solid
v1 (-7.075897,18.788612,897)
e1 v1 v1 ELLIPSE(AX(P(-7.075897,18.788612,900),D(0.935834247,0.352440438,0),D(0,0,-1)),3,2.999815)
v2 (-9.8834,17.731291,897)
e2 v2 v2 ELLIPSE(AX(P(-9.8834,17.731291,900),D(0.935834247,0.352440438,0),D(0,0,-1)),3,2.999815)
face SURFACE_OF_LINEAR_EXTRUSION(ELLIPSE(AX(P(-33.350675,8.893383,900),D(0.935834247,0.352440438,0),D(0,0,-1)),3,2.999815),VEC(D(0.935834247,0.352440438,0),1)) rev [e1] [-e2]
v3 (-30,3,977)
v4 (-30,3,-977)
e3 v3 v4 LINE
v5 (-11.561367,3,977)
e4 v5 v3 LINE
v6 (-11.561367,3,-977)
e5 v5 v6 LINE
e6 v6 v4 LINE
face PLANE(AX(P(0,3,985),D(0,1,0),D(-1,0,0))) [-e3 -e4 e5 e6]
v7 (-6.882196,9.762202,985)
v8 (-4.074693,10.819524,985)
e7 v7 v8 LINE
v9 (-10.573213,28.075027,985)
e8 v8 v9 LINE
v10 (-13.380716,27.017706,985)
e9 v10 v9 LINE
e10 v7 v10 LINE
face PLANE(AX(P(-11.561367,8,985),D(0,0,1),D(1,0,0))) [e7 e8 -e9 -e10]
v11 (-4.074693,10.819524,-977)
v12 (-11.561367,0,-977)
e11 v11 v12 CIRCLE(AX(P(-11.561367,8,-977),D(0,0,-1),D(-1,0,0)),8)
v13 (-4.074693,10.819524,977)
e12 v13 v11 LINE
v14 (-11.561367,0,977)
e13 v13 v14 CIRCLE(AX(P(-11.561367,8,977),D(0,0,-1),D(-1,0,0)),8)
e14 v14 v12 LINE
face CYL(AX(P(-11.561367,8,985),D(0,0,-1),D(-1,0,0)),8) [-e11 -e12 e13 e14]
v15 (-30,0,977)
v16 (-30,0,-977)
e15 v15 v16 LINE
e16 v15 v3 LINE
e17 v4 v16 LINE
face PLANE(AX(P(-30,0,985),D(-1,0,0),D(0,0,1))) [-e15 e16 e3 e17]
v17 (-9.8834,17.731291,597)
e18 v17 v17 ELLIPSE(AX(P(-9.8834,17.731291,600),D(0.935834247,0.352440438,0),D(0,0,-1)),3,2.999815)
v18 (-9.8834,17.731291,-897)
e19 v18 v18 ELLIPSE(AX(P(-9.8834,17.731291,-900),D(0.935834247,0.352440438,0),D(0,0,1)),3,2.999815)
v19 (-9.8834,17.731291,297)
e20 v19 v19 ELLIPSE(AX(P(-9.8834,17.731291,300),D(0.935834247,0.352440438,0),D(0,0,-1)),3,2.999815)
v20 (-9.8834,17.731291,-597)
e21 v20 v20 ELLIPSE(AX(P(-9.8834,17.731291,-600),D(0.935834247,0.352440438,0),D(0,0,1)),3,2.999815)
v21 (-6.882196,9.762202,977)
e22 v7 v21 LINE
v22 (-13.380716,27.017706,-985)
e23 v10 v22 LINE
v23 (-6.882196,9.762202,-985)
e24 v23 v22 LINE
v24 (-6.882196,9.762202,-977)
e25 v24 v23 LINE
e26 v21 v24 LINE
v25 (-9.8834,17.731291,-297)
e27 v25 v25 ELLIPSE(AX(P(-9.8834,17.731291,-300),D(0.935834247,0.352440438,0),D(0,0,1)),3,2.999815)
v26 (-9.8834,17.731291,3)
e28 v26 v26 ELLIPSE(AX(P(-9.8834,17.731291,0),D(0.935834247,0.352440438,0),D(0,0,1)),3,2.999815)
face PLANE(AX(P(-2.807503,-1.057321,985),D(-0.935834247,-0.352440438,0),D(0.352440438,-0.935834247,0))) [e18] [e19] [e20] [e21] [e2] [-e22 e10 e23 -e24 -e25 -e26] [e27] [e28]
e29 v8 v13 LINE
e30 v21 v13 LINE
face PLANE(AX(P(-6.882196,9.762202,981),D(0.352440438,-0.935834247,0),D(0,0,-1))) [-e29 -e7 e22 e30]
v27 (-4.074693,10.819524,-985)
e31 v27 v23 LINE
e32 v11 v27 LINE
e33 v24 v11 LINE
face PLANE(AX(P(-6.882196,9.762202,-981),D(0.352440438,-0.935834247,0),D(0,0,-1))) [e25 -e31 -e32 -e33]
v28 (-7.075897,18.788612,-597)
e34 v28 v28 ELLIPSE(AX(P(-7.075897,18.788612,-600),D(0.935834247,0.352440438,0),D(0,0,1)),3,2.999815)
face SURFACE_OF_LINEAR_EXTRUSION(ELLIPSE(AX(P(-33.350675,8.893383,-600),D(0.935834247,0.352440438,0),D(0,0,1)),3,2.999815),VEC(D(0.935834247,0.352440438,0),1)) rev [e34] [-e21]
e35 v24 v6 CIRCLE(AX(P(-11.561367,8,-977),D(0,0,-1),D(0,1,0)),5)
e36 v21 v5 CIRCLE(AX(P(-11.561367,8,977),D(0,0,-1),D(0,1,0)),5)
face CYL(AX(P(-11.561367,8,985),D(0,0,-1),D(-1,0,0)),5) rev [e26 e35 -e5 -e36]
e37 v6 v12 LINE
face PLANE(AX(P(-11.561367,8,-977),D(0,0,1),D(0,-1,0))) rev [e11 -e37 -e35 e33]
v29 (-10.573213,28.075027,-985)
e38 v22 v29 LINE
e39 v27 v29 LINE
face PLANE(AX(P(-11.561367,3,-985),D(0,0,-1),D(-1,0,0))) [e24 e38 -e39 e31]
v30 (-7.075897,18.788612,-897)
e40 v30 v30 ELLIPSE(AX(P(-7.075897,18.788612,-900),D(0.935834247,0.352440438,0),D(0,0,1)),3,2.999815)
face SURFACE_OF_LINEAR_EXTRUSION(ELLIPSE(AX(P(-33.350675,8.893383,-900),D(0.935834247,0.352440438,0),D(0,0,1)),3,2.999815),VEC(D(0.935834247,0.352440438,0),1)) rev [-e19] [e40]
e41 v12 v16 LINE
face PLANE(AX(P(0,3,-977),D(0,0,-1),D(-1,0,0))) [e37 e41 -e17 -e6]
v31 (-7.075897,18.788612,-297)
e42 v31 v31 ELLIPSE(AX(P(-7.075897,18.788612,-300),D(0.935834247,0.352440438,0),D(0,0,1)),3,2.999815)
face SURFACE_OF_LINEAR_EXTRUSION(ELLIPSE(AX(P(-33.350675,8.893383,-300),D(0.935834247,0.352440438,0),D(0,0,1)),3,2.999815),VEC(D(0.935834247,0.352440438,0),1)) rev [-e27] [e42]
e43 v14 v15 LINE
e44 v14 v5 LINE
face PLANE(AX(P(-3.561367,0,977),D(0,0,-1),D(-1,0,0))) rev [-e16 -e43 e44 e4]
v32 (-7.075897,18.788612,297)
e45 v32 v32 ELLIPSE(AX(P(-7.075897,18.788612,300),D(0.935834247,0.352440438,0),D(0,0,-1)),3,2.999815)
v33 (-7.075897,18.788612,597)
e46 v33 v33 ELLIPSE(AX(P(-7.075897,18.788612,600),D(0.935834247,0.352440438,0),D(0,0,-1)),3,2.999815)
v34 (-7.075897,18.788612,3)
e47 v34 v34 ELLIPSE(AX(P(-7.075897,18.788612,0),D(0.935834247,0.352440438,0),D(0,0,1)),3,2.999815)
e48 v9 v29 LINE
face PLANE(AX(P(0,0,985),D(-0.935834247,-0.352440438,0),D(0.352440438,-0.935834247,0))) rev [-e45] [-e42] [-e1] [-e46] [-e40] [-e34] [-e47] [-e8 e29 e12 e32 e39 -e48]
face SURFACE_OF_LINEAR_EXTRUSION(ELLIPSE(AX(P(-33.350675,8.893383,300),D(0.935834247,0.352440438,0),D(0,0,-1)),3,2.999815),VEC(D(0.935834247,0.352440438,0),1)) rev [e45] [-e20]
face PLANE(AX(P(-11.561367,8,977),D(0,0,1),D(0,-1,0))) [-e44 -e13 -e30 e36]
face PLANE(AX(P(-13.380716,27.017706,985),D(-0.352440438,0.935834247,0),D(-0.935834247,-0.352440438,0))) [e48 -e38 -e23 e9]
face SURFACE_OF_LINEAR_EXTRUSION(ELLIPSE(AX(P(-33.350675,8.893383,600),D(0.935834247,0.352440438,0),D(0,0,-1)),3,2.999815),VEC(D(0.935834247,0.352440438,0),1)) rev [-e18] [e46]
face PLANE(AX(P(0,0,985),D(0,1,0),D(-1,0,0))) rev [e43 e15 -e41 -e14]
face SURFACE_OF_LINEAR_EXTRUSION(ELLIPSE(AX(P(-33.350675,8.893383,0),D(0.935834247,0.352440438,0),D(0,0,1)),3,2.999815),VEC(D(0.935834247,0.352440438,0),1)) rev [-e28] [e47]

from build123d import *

# Parameters (mm, degrees)
SM_BASE_FLANGE_1_DEPTH = 985
CUT_EXTRUDE_START      = 977
CUT_EXTRUDE_1_DEPTH    = 8
CUT_EXTRUDE_2_REACH    = 987.857
SKETCH_4_RX            = 3
SKETCH_4_RY            = 2.999814796


# Read off the part's stored shape, not the designer's step: Вырез-Вытянуть1
# Sheet-metal steps are written as plain solids
with BuildPart() as part:
    # Sketch 1 → Базовая кромка1 (new, symmetric)
    with BuildSketch(Plane.XY):
        with BuildLine():
            Line((-10.573213138, 28.075027408), (-4.074693371, 10.819523503))
            ThreePointArc((-4.074693371, 10.819523503), (-4.982758525, 3.447867974), (-11.561367346, 0))
            Line((-11.561367346, 0), (-30, 0))
            Line((-30, 0), (-30, 3))
            Line((-30, 3), (-11.561367346, 3))
            ThreePointArc((-11.561367346, 3), (-7.449736833, 5.154917483), (-6.882196111, 9.76220219))
            Line((-6.882196111, 9.76220219), (-13.380715879, 27.017706094))
            Line((-13.380715879, 27.017706094), (-10.573213138, 28.075027408))
        make_face()
    extrude(amount=SM_BASE_FLANGE_1_DEPTH, both=True)

    # Вырез-Вытянуть1 outline → Вырез-Вытянуть1 (cut)
    with BuildSketch(Plane.XY.offset(CUT_EXTRUDE_START)):
        with BuildLine():
            Line((-4.074693371, 10.819523503), (-6.882196111, 9.76220219))
            ThreePointArc((-6.882196111, 9.76220219), (-7.449736833, 5.154917483), (-11.561367346, 3))
            Line((-11.561367346, 3), (-30, 3))
            Line((-30, 3), (-30, 0))
            Line((-30, 0), (-11.561367346, 0))
            ThreePointArc((-11.561367346, 0), (-4.982758526, 3.447867973), (-4.074693371, 10.819523503))
        make_face()
    cut_extrude_1 = extrude(amount=CUT_EXTRUDE_1_DEPTH, mode=Mode.SUBTRACT)

    # Зеркальное отражение1: Вырез-Вытянуть1 across plane
    add(cut_extrude_1.mirror(Plane.XY), mode=Mode.SUBTRACT)

    # Эскиз4 → Вырез-Вытянуть2 (cut, up to next)
    with BuildSketch(Plane(origin=(0, 0, 0), x_dir=(0, 0, -1), z_dir=(0.9358342469192185, 0.3524404379368797, 0)), mode=Mode.PRIVATE) as cut_extrude_2_sk1:
        with Locations(Location((600, 20.076859002), (0, 0, 180))):
            Ellipse(SKETCH_4_RX, SKETCH_4_RY)
    cut_extrude_2_tool1 = extrude(cut_extrude_2_sk1.sketch, amount=-CUT_EXTRUDE_2_REACH, mode=Mode.PRIVATE) & part.part
    # Эскиз4 → Вырез-Вытянуть2 (cut, up to next)
    with BuildSketch(Plane(origin=(0, 0, 0), x_dir=(0, 0, -1), z_dir=(0.9358342469192185, 0.3524404379368797, 0)), mode=Mode.PRIVATE) as cut_extrude_2_sk2:
        with Locations(Location((300, 20.076859002), (0, 0, 180))):
            Ellipse(SKETCH_4_RX, SKETCH_4_RY)
    cut_extrude_2_tool2 = extrude(cut_extrude_2_sk2.sketch, amount=-CUT_EXTRUDE_2_REACH, mode=Mode.PRIVATE) & part.part
    # Эскиз4 → Вырез-Вытянуть2 (cut, up to next)
    with BuildSketch(Plane(origin=(0, 0, 0), x_dir=(0, 0, -1), z_dir=(0.9358342469192185, 0.3524404379368797, 0)), mode=Mode.PRIVATE) as cut_extrude_2_sk3:
        with Locations(Location((0, 20.076859002), (0, 0, 180))):
            Ellipse(SKETCH_4_RX, SKETCH_4_RY)
    cut_extrude_2_tool3 = extrude(cut_extrude_2_sk3.sketch, amount=-CUT_EXTRUDE_2_REACH, mode=Mode.PRIVATE) & part.part
    # Эскиз4 → Вырез-Вытянуть2 (cut, up to next)
    with BuildSketch(Plane(origin=(0, 0, 0), x_dir=(0, 0, -1), z_dir=(0.9358342469192185, 0.3524404379368797, 0)), mode=Mode.PRIVATE) as cut_extrude_2_sk4:
        with Locations((-300, 20.076859002)):
            Ellipse(SKETCH_4_RX, SKETCH_4_RY)
    cut_extrude_2_tool4 = extrude(cut_extrude_2_sk4.sketch, amount=-CUT_EXTRUDE_2_REACH, mode=Mode.PRIVATE) & part.part
    # Эскиз4 → Вырез-Вытянуть2 (cut, up to next)
    with BuildSketch(Plane(origin=(0, 0, 0), x_dir=(0, 0, -1), z_dir=(0.9358342469192185, 0.3524404379368797, 0)), mode=Mode.PRIVATE) as cut_extrude_2_sk5:
        with Locations((-600, 20.076859002)):
            Ellipse(SKETCH_4_RX, SKETCH_4_RY)
    cut_extrude_2_tool5 = extrude(cut_extrude_2_sk5.sketch, amount=-CUT_EXTRUDE_2_REACH, mode=Mode.PRIVATE) & part.part
    # Эскиз4 → Вырез-Вытянуть2 (cut, up to next)
    with BuildSketch(Plane(origin=(0, 0, 0), x_dir=(0, 0, -1), z_dir=(0.9358342469192185, 0.3524404379368797, 0)), mode=Mode.PRIVATE) as cut_extrude_2_sk6:
        with Locations((-900, 20.076859002)):
            Ellipse(SKETCH_4_RX, SKETCH_4_RY)
    cut_extrude_2_tool6 = extrude(cut_extrude_2_sk6.sketch, amount=-CUT_EXTRUDE_2_REACH, mode=Mode.PRIVATE) & part.part
    # Эскиз4 → Вырез-Вытянуть2 (cut, up to next)
    with BuildSketch(Plane(origin=(0, 0, 0), x_dir=(0, 0, -1), z_dir=(0.9358342469192185, 0.3524404379368797, 0)), mode=Mode.PRIVATE) as cut_extrude_2_sk7:
        with Locations(Location((900, 20.076859002), (0, 0, 180))):
            Ellipse(SKETCH_4_RX, SKETCH_4_RY)
    cut_extrude_2_tool7 = extrude(cut_extrude_2_sk7.sketch, amount=-CUT_EXTRUDE_2_REACH, mode=Mode.PRIVATE) & part.part
    add(cut_extrude_2_tool1.solids().sort_by_distance((-7.075897, 18.788612, -600))[0], mode=Mode.SUBTRACT)
    add(cut_extrude_2_tool2.solids().sort_by_distance((-7.075897, 18.788612, -300))[0], mode=Mode.SUBTRACT)
    add(cut_extrude_2_tool3.solids().sort_by_distance((-7.075897, 18.788612, 0))[0], mode=Mode.SUBTRACT)
    add(cut_extrude_2_tool4.solids().sort_by_distance((-7.075897, 18.788612, 300))[0], mode=Mode.SUBTRACT)
    add(cut_extrude_2_tool5.solids().sort_by_distance((-7.075897, 18.788612, 600))[0], mode=Mode.SUBTRACT)
    add(cut_extrude_2_tool6.solids().sort_by_distance((-7.075897, 18.788612, 900))[0], mode=Mode.SUBTRACT)
    add(cut_extrude_2_tool7.solids().sort_by_distance((-7.075897, 18.788612, -900))[0], mode=Mode.SUBTRACT)


solid = part.part
